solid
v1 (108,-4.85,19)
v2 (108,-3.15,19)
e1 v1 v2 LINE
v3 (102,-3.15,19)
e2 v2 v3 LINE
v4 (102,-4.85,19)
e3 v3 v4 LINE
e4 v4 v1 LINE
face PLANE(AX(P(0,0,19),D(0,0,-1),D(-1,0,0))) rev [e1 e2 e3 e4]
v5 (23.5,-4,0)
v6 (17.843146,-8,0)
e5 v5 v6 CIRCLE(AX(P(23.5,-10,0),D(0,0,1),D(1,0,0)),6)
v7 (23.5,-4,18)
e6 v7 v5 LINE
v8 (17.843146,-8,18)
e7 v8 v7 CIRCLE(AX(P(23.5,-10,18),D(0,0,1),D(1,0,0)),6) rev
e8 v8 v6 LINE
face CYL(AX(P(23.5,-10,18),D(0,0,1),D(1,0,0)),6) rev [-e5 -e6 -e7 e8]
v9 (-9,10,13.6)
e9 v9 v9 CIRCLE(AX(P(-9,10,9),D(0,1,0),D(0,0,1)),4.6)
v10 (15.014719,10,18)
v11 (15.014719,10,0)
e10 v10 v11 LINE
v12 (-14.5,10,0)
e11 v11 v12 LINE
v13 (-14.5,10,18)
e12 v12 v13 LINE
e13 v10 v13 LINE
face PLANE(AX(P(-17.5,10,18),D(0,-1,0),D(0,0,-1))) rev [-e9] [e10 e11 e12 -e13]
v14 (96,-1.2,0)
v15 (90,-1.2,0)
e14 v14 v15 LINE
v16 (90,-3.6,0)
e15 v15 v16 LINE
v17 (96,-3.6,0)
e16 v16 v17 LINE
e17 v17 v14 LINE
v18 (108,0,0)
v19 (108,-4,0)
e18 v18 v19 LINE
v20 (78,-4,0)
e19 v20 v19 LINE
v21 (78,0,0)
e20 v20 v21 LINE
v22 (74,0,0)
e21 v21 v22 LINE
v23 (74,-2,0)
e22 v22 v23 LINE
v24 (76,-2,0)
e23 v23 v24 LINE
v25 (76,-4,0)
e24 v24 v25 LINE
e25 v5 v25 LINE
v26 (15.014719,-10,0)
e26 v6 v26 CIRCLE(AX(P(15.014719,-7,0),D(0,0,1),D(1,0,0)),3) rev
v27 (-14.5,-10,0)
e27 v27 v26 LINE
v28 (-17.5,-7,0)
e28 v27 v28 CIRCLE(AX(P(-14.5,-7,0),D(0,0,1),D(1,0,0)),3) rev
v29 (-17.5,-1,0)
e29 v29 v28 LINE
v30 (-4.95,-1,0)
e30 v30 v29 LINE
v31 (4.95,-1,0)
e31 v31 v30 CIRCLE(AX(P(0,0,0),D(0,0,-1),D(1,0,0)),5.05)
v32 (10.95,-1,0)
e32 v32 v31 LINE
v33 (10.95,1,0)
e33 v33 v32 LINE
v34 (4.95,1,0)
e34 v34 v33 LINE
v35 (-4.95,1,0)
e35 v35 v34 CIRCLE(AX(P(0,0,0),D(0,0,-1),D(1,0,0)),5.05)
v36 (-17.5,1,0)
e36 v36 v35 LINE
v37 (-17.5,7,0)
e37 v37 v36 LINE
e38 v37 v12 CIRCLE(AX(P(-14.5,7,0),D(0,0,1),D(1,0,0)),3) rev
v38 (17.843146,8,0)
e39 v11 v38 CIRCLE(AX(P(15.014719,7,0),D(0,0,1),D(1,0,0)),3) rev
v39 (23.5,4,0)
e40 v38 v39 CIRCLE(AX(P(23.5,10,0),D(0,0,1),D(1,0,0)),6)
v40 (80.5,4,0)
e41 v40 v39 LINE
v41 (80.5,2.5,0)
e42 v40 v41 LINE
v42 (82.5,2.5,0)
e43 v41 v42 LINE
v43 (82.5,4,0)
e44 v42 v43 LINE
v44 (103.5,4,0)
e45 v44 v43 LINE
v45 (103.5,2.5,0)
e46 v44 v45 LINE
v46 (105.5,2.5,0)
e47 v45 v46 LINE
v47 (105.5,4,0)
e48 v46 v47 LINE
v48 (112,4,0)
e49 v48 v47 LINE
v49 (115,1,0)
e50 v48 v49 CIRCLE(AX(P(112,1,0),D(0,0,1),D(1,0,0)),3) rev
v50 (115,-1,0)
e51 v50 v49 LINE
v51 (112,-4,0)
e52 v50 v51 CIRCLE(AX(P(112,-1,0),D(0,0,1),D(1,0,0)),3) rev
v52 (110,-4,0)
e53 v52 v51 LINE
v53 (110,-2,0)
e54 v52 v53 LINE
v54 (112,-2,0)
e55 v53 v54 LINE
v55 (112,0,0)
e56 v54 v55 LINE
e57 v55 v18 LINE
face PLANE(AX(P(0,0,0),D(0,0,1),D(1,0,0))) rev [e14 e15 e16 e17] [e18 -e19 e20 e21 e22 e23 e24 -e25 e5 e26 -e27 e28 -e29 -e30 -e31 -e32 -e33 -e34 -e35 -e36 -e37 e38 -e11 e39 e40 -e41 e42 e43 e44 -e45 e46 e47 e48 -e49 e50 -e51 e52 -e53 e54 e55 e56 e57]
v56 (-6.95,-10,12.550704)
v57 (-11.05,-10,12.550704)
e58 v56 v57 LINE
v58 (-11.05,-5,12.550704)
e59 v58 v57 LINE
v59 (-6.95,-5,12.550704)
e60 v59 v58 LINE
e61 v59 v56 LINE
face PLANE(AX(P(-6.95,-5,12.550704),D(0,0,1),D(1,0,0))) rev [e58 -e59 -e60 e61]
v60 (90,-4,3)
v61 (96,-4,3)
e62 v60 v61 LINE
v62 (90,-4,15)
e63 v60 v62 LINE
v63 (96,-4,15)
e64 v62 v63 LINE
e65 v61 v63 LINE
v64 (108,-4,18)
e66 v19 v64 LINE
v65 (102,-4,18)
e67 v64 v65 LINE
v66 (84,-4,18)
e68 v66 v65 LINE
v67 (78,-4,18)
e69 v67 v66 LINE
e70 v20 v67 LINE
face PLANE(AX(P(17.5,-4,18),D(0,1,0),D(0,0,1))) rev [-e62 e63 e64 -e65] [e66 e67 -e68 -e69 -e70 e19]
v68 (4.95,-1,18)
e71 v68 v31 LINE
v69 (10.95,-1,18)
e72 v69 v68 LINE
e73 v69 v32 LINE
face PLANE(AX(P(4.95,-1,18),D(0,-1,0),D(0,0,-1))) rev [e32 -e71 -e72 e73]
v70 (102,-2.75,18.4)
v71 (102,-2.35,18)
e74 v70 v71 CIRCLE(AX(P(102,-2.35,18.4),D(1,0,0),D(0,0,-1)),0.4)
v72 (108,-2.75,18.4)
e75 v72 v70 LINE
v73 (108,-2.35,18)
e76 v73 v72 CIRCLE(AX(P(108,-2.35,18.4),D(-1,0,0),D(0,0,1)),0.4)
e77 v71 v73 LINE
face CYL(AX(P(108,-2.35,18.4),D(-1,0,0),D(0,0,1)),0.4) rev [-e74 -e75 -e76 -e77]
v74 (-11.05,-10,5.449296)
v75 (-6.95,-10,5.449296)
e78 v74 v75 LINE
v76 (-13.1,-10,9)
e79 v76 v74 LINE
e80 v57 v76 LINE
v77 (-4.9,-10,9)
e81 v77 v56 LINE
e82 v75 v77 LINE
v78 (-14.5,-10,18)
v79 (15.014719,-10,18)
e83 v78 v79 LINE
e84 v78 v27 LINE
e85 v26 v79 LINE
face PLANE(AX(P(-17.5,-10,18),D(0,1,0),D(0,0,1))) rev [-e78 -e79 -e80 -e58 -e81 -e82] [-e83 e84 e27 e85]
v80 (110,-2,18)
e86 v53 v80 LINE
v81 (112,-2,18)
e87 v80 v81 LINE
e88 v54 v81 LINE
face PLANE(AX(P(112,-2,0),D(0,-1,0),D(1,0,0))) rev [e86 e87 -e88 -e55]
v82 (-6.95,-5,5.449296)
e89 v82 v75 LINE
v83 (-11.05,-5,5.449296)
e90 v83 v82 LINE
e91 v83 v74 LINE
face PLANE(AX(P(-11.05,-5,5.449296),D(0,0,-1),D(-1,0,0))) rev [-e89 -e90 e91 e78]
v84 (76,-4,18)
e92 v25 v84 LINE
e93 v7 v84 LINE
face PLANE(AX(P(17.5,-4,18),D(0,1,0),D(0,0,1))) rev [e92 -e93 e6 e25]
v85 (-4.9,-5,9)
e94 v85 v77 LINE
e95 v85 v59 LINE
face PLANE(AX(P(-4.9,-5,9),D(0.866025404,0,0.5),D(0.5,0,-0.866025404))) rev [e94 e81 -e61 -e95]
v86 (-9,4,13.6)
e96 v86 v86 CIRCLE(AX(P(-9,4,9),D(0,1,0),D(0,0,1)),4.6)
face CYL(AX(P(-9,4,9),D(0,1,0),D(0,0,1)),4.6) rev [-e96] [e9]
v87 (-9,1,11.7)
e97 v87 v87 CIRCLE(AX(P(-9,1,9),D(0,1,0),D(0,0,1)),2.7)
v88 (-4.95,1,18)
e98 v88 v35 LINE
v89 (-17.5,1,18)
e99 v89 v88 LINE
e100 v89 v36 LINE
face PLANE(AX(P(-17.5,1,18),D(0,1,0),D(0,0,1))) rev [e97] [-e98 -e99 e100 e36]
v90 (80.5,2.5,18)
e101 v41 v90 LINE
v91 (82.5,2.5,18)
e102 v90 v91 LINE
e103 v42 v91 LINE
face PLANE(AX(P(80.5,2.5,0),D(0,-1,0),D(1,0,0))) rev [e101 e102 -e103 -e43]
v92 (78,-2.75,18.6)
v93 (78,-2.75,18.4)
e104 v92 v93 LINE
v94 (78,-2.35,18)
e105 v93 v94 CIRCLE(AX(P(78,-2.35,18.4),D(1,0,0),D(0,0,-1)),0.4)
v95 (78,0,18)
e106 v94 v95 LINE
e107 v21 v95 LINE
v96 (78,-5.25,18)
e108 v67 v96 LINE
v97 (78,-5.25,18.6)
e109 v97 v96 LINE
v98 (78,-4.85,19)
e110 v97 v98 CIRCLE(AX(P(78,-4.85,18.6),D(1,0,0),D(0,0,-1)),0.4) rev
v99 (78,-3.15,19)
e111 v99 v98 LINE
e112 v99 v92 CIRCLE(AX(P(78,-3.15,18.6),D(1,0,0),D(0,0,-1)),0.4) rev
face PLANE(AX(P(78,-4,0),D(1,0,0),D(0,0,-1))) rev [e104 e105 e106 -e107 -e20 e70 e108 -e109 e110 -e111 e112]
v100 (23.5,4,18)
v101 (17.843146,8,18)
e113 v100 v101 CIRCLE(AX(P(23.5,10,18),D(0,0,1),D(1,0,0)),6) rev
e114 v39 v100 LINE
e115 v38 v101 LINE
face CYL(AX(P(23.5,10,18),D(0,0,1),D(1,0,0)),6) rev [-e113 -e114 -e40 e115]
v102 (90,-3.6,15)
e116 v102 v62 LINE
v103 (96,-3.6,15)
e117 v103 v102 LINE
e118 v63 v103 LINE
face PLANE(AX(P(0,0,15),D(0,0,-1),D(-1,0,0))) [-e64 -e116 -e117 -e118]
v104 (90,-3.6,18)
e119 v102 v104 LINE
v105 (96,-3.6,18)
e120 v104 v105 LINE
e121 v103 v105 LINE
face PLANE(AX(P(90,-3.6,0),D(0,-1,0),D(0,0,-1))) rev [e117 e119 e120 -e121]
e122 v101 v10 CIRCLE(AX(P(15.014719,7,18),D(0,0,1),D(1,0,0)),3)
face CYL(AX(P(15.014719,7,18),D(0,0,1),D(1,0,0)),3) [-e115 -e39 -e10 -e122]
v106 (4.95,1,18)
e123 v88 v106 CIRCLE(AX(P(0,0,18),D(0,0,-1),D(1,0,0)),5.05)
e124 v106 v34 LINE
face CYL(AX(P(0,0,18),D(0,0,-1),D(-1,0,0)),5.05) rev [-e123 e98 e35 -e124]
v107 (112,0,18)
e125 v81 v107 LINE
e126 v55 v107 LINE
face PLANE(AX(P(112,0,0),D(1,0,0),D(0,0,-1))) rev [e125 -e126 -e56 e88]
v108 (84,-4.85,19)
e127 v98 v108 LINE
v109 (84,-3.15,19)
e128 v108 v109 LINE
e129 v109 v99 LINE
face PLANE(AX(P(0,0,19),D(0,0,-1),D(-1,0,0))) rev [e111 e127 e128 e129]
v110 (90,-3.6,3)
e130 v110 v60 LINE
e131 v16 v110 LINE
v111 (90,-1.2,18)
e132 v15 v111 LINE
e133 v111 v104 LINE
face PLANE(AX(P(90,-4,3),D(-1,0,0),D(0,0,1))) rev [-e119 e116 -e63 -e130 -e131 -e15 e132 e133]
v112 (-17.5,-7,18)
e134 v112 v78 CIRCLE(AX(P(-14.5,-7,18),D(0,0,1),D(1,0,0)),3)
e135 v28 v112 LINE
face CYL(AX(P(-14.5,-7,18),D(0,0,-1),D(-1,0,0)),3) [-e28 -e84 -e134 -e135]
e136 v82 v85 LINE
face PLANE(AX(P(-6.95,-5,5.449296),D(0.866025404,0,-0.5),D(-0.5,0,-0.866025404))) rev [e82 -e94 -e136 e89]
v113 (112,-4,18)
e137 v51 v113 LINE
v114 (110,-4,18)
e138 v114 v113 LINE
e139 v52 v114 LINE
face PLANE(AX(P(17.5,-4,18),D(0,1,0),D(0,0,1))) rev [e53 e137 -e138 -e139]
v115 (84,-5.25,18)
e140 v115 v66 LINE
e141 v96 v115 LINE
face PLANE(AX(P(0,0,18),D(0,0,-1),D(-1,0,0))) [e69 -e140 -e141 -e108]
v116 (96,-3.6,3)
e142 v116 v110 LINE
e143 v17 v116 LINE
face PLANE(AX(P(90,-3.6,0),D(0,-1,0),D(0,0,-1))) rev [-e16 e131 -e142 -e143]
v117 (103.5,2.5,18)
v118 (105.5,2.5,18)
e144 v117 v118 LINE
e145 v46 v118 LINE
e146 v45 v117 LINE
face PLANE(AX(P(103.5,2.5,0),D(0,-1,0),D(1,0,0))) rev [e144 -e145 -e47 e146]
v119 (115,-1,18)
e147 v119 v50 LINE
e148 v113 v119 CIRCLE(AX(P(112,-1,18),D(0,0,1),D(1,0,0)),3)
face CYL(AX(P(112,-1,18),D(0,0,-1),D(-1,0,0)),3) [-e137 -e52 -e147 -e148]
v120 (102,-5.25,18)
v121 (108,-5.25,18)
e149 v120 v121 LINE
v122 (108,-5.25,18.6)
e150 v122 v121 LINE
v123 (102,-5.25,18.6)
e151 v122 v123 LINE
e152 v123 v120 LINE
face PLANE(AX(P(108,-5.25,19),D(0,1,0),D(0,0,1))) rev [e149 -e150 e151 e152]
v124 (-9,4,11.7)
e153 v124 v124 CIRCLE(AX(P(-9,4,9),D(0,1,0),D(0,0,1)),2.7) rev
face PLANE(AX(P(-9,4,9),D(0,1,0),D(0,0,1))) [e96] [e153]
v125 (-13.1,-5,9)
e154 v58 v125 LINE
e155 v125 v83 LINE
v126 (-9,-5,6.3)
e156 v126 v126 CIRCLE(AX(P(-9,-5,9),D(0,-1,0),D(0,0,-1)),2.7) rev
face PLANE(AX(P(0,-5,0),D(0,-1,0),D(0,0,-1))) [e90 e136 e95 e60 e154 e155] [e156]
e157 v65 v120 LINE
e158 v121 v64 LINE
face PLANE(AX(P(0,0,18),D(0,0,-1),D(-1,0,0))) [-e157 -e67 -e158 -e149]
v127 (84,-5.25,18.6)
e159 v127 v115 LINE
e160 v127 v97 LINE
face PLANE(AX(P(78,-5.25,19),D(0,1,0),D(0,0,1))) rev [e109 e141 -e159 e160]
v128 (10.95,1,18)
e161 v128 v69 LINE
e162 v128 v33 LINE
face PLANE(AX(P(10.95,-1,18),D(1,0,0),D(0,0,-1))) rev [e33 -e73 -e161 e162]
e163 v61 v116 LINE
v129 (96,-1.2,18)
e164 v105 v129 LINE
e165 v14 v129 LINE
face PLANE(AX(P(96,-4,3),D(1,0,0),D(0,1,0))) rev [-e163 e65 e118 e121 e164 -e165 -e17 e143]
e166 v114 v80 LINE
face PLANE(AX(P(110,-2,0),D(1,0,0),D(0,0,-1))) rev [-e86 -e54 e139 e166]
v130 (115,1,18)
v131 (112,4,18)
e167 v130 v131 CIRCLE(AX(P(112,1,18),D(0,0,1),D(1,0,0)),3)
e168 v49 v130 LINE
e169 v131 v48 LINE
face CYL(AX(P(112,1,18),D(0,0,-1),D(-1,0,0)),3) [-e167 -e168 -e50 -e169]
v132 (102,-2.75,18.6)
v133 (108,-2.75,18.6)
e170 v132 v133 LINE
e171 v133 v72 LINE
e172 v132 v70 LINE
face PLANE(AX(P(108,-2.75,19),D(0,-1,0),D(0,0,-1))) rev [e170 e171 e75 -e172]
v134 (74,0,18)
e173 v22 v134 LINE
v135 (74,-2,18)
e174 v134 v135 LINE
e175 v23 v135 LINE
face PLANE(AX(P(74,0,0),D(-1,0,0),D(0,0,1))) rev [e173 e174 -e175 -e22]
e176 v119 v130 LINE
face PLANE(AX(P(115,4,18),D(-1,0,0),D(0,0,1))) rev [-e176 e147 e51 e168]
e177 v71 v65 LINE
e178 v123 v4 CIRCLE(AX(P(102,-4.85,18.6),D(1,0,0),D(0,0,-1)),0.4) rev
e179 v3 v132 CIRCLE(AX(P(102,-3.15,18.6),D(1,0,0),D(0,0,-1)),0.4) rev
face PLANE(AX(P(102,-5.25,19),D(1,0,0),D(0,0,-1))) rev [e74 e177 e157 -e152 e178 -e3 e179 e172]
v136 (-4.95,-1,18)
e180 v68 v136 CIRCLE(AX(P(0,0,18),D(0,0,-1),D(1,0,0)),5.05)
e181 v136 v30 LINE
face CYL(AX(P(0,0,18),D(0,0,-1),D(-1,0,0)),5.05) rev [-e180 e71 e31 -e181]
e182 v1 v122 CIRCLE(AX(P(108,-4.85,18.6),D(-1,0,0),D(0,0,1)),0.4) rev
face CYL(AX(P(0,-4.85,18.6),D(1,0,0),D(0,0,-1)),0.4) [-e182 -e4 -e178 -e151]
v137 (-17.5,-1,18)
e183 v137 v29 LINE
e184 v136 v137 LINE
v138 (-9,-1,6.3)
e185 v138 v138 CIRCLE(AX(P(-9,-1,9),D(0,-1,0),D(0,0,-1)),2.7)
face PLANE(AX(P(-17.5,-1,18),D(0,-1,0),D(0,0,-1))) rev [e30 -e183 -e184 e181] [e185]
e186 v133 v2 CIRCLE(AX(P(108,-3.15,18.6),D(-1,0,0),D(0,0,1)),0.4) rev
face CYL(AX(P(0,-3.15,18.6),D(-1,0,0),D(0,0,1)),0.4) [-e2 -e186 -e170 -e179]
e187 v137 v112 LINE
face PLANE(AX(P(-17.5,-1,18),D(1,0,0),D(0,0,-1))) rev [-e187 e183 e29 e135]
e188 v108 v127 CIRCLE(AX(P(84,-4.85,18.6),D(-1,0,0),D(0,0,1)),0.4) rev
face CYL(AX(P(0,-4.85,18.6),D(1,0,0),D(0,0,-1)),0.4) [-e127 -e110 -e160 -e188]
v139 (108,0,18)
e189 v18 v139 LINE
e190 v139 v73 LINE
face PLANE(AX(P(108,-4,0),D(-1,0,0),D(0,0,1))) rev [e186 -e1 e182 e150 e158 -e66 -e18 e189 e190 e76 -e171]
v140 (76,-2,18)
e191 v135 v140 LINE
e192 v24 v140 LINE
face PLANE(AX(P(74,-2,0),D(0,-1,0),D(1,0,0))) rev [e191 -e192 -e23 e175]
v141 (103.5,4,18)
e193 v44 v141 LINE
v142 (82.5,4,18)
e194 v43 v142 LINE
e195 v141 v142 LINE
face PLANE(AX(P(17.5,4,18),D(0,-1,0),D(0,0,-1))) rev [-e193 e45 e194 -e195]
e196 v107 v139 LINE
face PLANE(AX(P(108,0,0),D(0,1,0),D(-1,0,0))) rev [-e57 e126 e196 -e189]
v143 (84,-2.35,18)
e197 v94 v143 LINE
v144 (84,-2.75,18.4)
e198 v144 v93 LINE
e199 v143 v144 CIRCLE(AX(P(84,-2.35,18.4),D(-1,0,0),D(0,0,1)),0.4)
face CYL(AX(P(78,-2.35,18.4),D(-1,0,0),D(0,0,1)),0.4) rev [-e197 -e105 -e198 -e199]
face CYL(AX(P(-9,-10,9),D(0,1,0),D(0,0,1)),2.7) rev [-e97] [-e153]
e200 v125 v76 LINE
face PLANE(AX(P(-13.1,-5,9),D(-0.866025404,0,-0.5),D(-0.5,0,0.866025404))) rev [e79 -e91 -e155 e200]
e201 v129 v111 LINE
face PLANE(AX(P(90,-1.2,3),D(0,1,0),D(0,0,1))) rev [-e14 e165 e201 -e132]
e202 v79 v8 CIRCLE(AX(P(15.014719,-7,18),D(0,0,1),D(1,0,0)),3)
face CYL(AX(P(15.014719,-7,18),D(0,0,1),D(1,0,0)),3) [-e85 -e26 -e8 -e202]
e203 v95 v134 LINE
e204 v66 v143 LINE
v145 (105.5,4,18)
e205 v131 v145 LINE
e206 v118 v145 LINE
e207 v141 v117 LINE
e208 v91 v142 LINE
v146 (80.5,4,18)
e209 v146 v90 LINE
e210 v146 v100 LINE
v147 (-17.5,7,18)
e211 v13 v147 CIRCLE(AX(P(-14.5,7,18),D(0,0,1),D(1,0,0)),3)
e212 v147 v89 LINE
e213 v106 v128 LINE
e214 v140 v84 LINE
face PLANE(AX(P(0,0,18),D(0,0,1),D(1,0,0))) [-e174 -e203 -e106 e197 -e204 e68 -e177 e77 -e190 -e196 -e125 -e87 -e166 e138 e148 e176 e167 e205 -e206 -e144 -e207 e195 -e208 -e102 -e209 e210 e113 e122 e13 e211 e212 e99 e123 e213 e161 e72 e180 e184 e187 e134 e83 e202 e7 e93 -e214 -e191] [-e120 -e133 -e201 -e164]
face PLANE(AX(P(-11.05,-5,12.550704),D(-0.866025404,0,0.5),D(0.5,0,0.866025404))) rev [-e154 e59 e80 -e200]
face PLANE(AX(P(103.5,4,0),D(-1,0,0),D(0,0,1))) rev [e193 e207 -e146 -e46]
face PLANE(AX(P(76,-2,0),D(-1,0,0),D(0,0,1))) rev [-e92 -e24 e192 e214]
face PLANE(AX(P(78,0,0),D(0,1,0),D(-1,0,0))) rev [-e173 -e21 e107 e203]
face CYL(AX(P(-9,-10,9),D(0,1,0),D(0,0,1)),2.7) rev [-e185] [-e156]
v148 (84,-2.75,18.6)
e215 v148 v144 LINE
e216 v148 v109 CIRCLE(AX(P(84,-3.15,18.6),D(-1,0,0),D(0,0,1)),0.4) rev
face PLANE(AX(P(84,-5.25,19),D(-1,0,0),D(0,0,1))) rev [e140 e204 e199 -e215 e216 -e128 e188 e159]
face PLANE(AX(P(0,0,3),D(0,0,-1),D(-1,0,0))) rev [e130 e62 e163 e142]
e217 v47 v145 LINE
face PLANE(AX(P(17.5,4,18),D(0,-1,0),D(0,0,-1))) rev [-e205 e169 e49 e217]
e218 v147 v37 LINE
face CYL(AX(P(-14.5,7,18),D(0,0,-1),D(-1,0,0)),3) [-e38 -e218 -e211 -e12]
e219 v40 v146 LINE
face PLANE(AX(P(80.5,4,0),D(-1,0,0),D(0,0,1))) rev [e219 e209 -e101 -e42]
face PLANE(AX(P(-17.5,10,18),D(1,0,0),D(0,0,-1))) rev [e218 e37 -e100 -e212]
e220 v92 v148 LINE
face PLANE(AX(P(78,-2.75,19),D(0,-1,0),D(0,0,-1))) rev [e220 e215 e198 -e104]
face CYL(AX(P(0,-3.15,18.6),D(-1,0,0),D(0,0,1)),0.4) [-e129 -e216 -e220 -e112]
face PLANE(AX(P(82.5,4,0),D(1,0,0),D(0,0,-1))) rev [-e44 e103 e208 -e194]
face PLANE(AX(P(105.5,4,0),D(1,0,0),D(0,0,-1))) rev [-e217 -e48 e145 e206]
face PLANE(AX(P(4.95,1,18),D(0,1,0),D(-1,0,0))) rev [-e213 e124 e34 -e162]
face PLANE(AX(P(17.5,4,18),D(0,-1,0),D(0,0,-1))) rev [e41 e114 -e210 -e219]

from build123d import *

# Parameters (mm, degrees)
BEAM_FOOTPRINT_DEPTH          = 18
FILLET1_R                     = 6
FILLET2_R                     = 3
FILLET3_R                     = 3
SKETCH7_R                     = 2.7
M5_BOLT_DEPTH                 = 119.105884826
SKETCH9_W                     = 6
SKETCH9_H                     = 2.8
FS_CUTOUT_DEPTH               = 6
M5_NUT_CUTOUT_DEPTH           = 5
RUBBER_BAND_NOTCH_DEPTH       = 116.784282296
RUBBER_BAND_NOTCH_DEPTH_BACK  = 116.784282296
SKETCH10_W                    = 2
SKETCH10_H                    = 1.5
WIRE_CUTOUT_DEPTH             = 117.404467388
WIRE_CUTOUT_DEPTH_BACK        = 117.404467388
SKETCH13_W                    = 6
SKETCH13_H                    = 2.4
SKETCH15_R                    = 4.6
M5_BOLT_HEAD_DEPTH            = 6
SLIDE_PLATE_CUTOUT_DEPTH      = 117.828934895
SLIDE_PLATE_CUTOUT_DEPTH_BACK = 117.828934895
SKETCH17_W                    = 6
SKETCH17_H                    = 2.5
FS_COVER_STOP_DEPTH           = 1
FILLET4_R                     = 0.4


with BuildPart() as part:
    # Sketch1 → beam footprint (new body)
    with BuildSketch(Plane.XY):
        with BuildLine():
            Line((17.5, -4), (17.5, -10))
            Line((17.5, -10), (-17.5, -10))
            Line((-17.5, -10), (-17.5, -1))
            Line((-17.5, -1), (-4.95, -1))
            ThreePointArc((-4.95, -1), (0, -5.05), (4.95, -1))
            Line((4.95, -1), (10.95, -1))
            Line((10.95, -1), (10.95, 1))
            Line((10.95, 1), (4.95, 1))
            ThreePointArc((4.95, 1), (0, 5.05), (-4.95, 1))
            Line((-4.95, 1), (-17.5, 1))
            Line((-17.5, 1), (-17.5, 10))
            Line((-17.5, 10), (17.5, 10))
            Line((17.5, 10), (17.5, 4))
            Line((17.5, 4), (115, 4))
            Line((115, 4), (115, -4))
            Line((115, -4), (17.5, -4))
        make_face()
    extrude(amount=BEAM_FOOTPRINT_DEPTH)

    # Fillet1
    fillet1_edges = [part.edges().sort_by_distance(p)[0] for p in [
        (17.5, -4, 9),
        (17.5, 4, 9),
    ]]
    fillet(fillet1_edges, radius=FILLET1_R - 0.0001)  # a hair under: the kernel refuses the full size

    # Fillet2
    fillet2_edges = [part.edges().sort_by_distance(p)[0] for p in [
        (17.5, -10, 9),
        (-17.5, -10, 9),
        (-17.5, 10, 9),
        (17.5, 10, 9),
    ]]
    fillet(fillet2_edges, radius=FILLET2_R)

    # Fillet3
    fillet3_edges = [part.edges().sort_by_distance(p)[0] for p in [
        (115, 4, 9),
        (115, -4, 9),
    ]]
    fillet(fillet3_edges, radius=FILLET3_R)

    # Sketch7 → M5 Bolt (cut, through all)
    with BuildSketch(Plane(origin=(0, 10, 0), x_dir=(1, 0, 0), z_dir=(0, 1, 0))):
        with Locations(Location((-9, -9, 0), (0, 0, 270))):
            Circle(SKETCH7_R)
    extrude(amount=-M5_BOLT_DEPTH, mode=Mode.SUBTRACT)

    # Sketch9 → FS Cutout (cut, symmetric)
    with BuildSketch(Plane.XY.offset(9)):
        with Locations((93, -2.6)):
            Rectangle(SKETCH9_W, SKETCH9_H)
    extrude(amount=FS_CUTOUT_DEPTH, both=True, mode=Mode.SUBTRACT)

    # Sketch16 → M5 Nut cutout (cut)
    with BuildSketch(Plane.XZ.offset(10)):
        Polygon((-4.9, 9), (-6.95, 12.550704156), (-11.05, 12.550704156), (-13.1, 9), (-11.05, 5.449295844), (-6.95, 5.449295844), align=None)
    extrude(amount=-M5_NUT_CUTOUT_DEPTH, mode=Mode.SUBTRACT)

    # Sketch10 → Rubber Band Notch (cut, two sides: drawn at the far end of the back side and taken through both)
    with BuildSketch(Plane.XY.offset(9).offset(-RUBBER_BAND_NOTCH_DEPTH_BACK)):
        with Locations((81.5, 3.25)):
            Rectangle(SKETCH10_W, SKETCH10_H)
        with Locations((104.5, 3.25)):
            Rectangle(SKETCH10_W, SKETCH10_H)
    extrude(amount=RUBBER_BAND_NOTCH_DEPTH + RUBBER_BAND_NOTCH_DEPTH_BACK, mode=Mode.SUBTRACT)

    # Sketch13 → Wire Cutout (cut, two sides: drawn at the far end of the back side and taken through both)
    with BuildSketch(Plane.XY.offset(3).offset(-WIRE_CUTOUT_DEPTH_BACK)):
        with Locations((93, -2.4)):
            Rectangle(SKETCH13_W, SKETCH13_H)
    extrude(amount=WIRE_CUTOUT_DEPTH + WIRE_CUTOUT_DEPTH_BACK, mode=Mode.SUBTRACT)

    # Sketch15 → M5 Bolt Head (cut)
    with BuildSketch(Plane(origin=(0, 10, 0), x_dir=(1, 0, 0), z_dir=(0, 1, 0))):
        with Locations(Location((-9, -9, 0), (0, 0, 270))):
            Circle(SKETCH15_R)
    extrude(amount=-M5_BOLT_HEAD_DEPTH, mode=Mode.SUBTRACT)

    # Sketch14 → Slide Plate Cutout (cut, two sides: drawn at the far end of the back side and taken through both)
    with BuildSketch(Plane.XY.offset(18).offset(-SLIDE_PLATE_CUTOUT_DEPTH_BACK)):
        Polygon((108, -4), (108, 0), (112, 0), (112, -2), (110, -2), (110, -4), align=None)
        Polygon((78, -4), (76, -4), (76, -2), (74, -2), (74, 0), (78, 0), align=None)
    extrude(amount=SLIDE_PLATE_CUTOUT_DEPTH + SLIDE_PLATE_CUTOUT_DEPTH_BACK, mode=Mode.SUBTRACT)

    # Sketch17 → FS cover stop (add)
    with BuildSketch(Plane.XY.offset(18)):
        with Locations((81, -4)):
            Rectangle(SKETCH17_W, SKETCH17_H)
        with Locations((105, -4)):
            Rectangle(SKETCH17_W, SKETCH17_H)
    extrude(amount=FS_COVER_STOP_DEPTH)

    # Fillet4
    fillet4_edges = [part.edges().sort_by_distance(p)[0] for p in [
        (81, -2.75, 18),
        (81, -5.25, 19),
        (81, -2.75, 19),
        (105, -2.75, 18),
        (105, -5.25, 19),
        (105, -2.75, 19),
    ]]
    fillet(fillet4_edges, radius=FILLET4_R)


solid = part.part
